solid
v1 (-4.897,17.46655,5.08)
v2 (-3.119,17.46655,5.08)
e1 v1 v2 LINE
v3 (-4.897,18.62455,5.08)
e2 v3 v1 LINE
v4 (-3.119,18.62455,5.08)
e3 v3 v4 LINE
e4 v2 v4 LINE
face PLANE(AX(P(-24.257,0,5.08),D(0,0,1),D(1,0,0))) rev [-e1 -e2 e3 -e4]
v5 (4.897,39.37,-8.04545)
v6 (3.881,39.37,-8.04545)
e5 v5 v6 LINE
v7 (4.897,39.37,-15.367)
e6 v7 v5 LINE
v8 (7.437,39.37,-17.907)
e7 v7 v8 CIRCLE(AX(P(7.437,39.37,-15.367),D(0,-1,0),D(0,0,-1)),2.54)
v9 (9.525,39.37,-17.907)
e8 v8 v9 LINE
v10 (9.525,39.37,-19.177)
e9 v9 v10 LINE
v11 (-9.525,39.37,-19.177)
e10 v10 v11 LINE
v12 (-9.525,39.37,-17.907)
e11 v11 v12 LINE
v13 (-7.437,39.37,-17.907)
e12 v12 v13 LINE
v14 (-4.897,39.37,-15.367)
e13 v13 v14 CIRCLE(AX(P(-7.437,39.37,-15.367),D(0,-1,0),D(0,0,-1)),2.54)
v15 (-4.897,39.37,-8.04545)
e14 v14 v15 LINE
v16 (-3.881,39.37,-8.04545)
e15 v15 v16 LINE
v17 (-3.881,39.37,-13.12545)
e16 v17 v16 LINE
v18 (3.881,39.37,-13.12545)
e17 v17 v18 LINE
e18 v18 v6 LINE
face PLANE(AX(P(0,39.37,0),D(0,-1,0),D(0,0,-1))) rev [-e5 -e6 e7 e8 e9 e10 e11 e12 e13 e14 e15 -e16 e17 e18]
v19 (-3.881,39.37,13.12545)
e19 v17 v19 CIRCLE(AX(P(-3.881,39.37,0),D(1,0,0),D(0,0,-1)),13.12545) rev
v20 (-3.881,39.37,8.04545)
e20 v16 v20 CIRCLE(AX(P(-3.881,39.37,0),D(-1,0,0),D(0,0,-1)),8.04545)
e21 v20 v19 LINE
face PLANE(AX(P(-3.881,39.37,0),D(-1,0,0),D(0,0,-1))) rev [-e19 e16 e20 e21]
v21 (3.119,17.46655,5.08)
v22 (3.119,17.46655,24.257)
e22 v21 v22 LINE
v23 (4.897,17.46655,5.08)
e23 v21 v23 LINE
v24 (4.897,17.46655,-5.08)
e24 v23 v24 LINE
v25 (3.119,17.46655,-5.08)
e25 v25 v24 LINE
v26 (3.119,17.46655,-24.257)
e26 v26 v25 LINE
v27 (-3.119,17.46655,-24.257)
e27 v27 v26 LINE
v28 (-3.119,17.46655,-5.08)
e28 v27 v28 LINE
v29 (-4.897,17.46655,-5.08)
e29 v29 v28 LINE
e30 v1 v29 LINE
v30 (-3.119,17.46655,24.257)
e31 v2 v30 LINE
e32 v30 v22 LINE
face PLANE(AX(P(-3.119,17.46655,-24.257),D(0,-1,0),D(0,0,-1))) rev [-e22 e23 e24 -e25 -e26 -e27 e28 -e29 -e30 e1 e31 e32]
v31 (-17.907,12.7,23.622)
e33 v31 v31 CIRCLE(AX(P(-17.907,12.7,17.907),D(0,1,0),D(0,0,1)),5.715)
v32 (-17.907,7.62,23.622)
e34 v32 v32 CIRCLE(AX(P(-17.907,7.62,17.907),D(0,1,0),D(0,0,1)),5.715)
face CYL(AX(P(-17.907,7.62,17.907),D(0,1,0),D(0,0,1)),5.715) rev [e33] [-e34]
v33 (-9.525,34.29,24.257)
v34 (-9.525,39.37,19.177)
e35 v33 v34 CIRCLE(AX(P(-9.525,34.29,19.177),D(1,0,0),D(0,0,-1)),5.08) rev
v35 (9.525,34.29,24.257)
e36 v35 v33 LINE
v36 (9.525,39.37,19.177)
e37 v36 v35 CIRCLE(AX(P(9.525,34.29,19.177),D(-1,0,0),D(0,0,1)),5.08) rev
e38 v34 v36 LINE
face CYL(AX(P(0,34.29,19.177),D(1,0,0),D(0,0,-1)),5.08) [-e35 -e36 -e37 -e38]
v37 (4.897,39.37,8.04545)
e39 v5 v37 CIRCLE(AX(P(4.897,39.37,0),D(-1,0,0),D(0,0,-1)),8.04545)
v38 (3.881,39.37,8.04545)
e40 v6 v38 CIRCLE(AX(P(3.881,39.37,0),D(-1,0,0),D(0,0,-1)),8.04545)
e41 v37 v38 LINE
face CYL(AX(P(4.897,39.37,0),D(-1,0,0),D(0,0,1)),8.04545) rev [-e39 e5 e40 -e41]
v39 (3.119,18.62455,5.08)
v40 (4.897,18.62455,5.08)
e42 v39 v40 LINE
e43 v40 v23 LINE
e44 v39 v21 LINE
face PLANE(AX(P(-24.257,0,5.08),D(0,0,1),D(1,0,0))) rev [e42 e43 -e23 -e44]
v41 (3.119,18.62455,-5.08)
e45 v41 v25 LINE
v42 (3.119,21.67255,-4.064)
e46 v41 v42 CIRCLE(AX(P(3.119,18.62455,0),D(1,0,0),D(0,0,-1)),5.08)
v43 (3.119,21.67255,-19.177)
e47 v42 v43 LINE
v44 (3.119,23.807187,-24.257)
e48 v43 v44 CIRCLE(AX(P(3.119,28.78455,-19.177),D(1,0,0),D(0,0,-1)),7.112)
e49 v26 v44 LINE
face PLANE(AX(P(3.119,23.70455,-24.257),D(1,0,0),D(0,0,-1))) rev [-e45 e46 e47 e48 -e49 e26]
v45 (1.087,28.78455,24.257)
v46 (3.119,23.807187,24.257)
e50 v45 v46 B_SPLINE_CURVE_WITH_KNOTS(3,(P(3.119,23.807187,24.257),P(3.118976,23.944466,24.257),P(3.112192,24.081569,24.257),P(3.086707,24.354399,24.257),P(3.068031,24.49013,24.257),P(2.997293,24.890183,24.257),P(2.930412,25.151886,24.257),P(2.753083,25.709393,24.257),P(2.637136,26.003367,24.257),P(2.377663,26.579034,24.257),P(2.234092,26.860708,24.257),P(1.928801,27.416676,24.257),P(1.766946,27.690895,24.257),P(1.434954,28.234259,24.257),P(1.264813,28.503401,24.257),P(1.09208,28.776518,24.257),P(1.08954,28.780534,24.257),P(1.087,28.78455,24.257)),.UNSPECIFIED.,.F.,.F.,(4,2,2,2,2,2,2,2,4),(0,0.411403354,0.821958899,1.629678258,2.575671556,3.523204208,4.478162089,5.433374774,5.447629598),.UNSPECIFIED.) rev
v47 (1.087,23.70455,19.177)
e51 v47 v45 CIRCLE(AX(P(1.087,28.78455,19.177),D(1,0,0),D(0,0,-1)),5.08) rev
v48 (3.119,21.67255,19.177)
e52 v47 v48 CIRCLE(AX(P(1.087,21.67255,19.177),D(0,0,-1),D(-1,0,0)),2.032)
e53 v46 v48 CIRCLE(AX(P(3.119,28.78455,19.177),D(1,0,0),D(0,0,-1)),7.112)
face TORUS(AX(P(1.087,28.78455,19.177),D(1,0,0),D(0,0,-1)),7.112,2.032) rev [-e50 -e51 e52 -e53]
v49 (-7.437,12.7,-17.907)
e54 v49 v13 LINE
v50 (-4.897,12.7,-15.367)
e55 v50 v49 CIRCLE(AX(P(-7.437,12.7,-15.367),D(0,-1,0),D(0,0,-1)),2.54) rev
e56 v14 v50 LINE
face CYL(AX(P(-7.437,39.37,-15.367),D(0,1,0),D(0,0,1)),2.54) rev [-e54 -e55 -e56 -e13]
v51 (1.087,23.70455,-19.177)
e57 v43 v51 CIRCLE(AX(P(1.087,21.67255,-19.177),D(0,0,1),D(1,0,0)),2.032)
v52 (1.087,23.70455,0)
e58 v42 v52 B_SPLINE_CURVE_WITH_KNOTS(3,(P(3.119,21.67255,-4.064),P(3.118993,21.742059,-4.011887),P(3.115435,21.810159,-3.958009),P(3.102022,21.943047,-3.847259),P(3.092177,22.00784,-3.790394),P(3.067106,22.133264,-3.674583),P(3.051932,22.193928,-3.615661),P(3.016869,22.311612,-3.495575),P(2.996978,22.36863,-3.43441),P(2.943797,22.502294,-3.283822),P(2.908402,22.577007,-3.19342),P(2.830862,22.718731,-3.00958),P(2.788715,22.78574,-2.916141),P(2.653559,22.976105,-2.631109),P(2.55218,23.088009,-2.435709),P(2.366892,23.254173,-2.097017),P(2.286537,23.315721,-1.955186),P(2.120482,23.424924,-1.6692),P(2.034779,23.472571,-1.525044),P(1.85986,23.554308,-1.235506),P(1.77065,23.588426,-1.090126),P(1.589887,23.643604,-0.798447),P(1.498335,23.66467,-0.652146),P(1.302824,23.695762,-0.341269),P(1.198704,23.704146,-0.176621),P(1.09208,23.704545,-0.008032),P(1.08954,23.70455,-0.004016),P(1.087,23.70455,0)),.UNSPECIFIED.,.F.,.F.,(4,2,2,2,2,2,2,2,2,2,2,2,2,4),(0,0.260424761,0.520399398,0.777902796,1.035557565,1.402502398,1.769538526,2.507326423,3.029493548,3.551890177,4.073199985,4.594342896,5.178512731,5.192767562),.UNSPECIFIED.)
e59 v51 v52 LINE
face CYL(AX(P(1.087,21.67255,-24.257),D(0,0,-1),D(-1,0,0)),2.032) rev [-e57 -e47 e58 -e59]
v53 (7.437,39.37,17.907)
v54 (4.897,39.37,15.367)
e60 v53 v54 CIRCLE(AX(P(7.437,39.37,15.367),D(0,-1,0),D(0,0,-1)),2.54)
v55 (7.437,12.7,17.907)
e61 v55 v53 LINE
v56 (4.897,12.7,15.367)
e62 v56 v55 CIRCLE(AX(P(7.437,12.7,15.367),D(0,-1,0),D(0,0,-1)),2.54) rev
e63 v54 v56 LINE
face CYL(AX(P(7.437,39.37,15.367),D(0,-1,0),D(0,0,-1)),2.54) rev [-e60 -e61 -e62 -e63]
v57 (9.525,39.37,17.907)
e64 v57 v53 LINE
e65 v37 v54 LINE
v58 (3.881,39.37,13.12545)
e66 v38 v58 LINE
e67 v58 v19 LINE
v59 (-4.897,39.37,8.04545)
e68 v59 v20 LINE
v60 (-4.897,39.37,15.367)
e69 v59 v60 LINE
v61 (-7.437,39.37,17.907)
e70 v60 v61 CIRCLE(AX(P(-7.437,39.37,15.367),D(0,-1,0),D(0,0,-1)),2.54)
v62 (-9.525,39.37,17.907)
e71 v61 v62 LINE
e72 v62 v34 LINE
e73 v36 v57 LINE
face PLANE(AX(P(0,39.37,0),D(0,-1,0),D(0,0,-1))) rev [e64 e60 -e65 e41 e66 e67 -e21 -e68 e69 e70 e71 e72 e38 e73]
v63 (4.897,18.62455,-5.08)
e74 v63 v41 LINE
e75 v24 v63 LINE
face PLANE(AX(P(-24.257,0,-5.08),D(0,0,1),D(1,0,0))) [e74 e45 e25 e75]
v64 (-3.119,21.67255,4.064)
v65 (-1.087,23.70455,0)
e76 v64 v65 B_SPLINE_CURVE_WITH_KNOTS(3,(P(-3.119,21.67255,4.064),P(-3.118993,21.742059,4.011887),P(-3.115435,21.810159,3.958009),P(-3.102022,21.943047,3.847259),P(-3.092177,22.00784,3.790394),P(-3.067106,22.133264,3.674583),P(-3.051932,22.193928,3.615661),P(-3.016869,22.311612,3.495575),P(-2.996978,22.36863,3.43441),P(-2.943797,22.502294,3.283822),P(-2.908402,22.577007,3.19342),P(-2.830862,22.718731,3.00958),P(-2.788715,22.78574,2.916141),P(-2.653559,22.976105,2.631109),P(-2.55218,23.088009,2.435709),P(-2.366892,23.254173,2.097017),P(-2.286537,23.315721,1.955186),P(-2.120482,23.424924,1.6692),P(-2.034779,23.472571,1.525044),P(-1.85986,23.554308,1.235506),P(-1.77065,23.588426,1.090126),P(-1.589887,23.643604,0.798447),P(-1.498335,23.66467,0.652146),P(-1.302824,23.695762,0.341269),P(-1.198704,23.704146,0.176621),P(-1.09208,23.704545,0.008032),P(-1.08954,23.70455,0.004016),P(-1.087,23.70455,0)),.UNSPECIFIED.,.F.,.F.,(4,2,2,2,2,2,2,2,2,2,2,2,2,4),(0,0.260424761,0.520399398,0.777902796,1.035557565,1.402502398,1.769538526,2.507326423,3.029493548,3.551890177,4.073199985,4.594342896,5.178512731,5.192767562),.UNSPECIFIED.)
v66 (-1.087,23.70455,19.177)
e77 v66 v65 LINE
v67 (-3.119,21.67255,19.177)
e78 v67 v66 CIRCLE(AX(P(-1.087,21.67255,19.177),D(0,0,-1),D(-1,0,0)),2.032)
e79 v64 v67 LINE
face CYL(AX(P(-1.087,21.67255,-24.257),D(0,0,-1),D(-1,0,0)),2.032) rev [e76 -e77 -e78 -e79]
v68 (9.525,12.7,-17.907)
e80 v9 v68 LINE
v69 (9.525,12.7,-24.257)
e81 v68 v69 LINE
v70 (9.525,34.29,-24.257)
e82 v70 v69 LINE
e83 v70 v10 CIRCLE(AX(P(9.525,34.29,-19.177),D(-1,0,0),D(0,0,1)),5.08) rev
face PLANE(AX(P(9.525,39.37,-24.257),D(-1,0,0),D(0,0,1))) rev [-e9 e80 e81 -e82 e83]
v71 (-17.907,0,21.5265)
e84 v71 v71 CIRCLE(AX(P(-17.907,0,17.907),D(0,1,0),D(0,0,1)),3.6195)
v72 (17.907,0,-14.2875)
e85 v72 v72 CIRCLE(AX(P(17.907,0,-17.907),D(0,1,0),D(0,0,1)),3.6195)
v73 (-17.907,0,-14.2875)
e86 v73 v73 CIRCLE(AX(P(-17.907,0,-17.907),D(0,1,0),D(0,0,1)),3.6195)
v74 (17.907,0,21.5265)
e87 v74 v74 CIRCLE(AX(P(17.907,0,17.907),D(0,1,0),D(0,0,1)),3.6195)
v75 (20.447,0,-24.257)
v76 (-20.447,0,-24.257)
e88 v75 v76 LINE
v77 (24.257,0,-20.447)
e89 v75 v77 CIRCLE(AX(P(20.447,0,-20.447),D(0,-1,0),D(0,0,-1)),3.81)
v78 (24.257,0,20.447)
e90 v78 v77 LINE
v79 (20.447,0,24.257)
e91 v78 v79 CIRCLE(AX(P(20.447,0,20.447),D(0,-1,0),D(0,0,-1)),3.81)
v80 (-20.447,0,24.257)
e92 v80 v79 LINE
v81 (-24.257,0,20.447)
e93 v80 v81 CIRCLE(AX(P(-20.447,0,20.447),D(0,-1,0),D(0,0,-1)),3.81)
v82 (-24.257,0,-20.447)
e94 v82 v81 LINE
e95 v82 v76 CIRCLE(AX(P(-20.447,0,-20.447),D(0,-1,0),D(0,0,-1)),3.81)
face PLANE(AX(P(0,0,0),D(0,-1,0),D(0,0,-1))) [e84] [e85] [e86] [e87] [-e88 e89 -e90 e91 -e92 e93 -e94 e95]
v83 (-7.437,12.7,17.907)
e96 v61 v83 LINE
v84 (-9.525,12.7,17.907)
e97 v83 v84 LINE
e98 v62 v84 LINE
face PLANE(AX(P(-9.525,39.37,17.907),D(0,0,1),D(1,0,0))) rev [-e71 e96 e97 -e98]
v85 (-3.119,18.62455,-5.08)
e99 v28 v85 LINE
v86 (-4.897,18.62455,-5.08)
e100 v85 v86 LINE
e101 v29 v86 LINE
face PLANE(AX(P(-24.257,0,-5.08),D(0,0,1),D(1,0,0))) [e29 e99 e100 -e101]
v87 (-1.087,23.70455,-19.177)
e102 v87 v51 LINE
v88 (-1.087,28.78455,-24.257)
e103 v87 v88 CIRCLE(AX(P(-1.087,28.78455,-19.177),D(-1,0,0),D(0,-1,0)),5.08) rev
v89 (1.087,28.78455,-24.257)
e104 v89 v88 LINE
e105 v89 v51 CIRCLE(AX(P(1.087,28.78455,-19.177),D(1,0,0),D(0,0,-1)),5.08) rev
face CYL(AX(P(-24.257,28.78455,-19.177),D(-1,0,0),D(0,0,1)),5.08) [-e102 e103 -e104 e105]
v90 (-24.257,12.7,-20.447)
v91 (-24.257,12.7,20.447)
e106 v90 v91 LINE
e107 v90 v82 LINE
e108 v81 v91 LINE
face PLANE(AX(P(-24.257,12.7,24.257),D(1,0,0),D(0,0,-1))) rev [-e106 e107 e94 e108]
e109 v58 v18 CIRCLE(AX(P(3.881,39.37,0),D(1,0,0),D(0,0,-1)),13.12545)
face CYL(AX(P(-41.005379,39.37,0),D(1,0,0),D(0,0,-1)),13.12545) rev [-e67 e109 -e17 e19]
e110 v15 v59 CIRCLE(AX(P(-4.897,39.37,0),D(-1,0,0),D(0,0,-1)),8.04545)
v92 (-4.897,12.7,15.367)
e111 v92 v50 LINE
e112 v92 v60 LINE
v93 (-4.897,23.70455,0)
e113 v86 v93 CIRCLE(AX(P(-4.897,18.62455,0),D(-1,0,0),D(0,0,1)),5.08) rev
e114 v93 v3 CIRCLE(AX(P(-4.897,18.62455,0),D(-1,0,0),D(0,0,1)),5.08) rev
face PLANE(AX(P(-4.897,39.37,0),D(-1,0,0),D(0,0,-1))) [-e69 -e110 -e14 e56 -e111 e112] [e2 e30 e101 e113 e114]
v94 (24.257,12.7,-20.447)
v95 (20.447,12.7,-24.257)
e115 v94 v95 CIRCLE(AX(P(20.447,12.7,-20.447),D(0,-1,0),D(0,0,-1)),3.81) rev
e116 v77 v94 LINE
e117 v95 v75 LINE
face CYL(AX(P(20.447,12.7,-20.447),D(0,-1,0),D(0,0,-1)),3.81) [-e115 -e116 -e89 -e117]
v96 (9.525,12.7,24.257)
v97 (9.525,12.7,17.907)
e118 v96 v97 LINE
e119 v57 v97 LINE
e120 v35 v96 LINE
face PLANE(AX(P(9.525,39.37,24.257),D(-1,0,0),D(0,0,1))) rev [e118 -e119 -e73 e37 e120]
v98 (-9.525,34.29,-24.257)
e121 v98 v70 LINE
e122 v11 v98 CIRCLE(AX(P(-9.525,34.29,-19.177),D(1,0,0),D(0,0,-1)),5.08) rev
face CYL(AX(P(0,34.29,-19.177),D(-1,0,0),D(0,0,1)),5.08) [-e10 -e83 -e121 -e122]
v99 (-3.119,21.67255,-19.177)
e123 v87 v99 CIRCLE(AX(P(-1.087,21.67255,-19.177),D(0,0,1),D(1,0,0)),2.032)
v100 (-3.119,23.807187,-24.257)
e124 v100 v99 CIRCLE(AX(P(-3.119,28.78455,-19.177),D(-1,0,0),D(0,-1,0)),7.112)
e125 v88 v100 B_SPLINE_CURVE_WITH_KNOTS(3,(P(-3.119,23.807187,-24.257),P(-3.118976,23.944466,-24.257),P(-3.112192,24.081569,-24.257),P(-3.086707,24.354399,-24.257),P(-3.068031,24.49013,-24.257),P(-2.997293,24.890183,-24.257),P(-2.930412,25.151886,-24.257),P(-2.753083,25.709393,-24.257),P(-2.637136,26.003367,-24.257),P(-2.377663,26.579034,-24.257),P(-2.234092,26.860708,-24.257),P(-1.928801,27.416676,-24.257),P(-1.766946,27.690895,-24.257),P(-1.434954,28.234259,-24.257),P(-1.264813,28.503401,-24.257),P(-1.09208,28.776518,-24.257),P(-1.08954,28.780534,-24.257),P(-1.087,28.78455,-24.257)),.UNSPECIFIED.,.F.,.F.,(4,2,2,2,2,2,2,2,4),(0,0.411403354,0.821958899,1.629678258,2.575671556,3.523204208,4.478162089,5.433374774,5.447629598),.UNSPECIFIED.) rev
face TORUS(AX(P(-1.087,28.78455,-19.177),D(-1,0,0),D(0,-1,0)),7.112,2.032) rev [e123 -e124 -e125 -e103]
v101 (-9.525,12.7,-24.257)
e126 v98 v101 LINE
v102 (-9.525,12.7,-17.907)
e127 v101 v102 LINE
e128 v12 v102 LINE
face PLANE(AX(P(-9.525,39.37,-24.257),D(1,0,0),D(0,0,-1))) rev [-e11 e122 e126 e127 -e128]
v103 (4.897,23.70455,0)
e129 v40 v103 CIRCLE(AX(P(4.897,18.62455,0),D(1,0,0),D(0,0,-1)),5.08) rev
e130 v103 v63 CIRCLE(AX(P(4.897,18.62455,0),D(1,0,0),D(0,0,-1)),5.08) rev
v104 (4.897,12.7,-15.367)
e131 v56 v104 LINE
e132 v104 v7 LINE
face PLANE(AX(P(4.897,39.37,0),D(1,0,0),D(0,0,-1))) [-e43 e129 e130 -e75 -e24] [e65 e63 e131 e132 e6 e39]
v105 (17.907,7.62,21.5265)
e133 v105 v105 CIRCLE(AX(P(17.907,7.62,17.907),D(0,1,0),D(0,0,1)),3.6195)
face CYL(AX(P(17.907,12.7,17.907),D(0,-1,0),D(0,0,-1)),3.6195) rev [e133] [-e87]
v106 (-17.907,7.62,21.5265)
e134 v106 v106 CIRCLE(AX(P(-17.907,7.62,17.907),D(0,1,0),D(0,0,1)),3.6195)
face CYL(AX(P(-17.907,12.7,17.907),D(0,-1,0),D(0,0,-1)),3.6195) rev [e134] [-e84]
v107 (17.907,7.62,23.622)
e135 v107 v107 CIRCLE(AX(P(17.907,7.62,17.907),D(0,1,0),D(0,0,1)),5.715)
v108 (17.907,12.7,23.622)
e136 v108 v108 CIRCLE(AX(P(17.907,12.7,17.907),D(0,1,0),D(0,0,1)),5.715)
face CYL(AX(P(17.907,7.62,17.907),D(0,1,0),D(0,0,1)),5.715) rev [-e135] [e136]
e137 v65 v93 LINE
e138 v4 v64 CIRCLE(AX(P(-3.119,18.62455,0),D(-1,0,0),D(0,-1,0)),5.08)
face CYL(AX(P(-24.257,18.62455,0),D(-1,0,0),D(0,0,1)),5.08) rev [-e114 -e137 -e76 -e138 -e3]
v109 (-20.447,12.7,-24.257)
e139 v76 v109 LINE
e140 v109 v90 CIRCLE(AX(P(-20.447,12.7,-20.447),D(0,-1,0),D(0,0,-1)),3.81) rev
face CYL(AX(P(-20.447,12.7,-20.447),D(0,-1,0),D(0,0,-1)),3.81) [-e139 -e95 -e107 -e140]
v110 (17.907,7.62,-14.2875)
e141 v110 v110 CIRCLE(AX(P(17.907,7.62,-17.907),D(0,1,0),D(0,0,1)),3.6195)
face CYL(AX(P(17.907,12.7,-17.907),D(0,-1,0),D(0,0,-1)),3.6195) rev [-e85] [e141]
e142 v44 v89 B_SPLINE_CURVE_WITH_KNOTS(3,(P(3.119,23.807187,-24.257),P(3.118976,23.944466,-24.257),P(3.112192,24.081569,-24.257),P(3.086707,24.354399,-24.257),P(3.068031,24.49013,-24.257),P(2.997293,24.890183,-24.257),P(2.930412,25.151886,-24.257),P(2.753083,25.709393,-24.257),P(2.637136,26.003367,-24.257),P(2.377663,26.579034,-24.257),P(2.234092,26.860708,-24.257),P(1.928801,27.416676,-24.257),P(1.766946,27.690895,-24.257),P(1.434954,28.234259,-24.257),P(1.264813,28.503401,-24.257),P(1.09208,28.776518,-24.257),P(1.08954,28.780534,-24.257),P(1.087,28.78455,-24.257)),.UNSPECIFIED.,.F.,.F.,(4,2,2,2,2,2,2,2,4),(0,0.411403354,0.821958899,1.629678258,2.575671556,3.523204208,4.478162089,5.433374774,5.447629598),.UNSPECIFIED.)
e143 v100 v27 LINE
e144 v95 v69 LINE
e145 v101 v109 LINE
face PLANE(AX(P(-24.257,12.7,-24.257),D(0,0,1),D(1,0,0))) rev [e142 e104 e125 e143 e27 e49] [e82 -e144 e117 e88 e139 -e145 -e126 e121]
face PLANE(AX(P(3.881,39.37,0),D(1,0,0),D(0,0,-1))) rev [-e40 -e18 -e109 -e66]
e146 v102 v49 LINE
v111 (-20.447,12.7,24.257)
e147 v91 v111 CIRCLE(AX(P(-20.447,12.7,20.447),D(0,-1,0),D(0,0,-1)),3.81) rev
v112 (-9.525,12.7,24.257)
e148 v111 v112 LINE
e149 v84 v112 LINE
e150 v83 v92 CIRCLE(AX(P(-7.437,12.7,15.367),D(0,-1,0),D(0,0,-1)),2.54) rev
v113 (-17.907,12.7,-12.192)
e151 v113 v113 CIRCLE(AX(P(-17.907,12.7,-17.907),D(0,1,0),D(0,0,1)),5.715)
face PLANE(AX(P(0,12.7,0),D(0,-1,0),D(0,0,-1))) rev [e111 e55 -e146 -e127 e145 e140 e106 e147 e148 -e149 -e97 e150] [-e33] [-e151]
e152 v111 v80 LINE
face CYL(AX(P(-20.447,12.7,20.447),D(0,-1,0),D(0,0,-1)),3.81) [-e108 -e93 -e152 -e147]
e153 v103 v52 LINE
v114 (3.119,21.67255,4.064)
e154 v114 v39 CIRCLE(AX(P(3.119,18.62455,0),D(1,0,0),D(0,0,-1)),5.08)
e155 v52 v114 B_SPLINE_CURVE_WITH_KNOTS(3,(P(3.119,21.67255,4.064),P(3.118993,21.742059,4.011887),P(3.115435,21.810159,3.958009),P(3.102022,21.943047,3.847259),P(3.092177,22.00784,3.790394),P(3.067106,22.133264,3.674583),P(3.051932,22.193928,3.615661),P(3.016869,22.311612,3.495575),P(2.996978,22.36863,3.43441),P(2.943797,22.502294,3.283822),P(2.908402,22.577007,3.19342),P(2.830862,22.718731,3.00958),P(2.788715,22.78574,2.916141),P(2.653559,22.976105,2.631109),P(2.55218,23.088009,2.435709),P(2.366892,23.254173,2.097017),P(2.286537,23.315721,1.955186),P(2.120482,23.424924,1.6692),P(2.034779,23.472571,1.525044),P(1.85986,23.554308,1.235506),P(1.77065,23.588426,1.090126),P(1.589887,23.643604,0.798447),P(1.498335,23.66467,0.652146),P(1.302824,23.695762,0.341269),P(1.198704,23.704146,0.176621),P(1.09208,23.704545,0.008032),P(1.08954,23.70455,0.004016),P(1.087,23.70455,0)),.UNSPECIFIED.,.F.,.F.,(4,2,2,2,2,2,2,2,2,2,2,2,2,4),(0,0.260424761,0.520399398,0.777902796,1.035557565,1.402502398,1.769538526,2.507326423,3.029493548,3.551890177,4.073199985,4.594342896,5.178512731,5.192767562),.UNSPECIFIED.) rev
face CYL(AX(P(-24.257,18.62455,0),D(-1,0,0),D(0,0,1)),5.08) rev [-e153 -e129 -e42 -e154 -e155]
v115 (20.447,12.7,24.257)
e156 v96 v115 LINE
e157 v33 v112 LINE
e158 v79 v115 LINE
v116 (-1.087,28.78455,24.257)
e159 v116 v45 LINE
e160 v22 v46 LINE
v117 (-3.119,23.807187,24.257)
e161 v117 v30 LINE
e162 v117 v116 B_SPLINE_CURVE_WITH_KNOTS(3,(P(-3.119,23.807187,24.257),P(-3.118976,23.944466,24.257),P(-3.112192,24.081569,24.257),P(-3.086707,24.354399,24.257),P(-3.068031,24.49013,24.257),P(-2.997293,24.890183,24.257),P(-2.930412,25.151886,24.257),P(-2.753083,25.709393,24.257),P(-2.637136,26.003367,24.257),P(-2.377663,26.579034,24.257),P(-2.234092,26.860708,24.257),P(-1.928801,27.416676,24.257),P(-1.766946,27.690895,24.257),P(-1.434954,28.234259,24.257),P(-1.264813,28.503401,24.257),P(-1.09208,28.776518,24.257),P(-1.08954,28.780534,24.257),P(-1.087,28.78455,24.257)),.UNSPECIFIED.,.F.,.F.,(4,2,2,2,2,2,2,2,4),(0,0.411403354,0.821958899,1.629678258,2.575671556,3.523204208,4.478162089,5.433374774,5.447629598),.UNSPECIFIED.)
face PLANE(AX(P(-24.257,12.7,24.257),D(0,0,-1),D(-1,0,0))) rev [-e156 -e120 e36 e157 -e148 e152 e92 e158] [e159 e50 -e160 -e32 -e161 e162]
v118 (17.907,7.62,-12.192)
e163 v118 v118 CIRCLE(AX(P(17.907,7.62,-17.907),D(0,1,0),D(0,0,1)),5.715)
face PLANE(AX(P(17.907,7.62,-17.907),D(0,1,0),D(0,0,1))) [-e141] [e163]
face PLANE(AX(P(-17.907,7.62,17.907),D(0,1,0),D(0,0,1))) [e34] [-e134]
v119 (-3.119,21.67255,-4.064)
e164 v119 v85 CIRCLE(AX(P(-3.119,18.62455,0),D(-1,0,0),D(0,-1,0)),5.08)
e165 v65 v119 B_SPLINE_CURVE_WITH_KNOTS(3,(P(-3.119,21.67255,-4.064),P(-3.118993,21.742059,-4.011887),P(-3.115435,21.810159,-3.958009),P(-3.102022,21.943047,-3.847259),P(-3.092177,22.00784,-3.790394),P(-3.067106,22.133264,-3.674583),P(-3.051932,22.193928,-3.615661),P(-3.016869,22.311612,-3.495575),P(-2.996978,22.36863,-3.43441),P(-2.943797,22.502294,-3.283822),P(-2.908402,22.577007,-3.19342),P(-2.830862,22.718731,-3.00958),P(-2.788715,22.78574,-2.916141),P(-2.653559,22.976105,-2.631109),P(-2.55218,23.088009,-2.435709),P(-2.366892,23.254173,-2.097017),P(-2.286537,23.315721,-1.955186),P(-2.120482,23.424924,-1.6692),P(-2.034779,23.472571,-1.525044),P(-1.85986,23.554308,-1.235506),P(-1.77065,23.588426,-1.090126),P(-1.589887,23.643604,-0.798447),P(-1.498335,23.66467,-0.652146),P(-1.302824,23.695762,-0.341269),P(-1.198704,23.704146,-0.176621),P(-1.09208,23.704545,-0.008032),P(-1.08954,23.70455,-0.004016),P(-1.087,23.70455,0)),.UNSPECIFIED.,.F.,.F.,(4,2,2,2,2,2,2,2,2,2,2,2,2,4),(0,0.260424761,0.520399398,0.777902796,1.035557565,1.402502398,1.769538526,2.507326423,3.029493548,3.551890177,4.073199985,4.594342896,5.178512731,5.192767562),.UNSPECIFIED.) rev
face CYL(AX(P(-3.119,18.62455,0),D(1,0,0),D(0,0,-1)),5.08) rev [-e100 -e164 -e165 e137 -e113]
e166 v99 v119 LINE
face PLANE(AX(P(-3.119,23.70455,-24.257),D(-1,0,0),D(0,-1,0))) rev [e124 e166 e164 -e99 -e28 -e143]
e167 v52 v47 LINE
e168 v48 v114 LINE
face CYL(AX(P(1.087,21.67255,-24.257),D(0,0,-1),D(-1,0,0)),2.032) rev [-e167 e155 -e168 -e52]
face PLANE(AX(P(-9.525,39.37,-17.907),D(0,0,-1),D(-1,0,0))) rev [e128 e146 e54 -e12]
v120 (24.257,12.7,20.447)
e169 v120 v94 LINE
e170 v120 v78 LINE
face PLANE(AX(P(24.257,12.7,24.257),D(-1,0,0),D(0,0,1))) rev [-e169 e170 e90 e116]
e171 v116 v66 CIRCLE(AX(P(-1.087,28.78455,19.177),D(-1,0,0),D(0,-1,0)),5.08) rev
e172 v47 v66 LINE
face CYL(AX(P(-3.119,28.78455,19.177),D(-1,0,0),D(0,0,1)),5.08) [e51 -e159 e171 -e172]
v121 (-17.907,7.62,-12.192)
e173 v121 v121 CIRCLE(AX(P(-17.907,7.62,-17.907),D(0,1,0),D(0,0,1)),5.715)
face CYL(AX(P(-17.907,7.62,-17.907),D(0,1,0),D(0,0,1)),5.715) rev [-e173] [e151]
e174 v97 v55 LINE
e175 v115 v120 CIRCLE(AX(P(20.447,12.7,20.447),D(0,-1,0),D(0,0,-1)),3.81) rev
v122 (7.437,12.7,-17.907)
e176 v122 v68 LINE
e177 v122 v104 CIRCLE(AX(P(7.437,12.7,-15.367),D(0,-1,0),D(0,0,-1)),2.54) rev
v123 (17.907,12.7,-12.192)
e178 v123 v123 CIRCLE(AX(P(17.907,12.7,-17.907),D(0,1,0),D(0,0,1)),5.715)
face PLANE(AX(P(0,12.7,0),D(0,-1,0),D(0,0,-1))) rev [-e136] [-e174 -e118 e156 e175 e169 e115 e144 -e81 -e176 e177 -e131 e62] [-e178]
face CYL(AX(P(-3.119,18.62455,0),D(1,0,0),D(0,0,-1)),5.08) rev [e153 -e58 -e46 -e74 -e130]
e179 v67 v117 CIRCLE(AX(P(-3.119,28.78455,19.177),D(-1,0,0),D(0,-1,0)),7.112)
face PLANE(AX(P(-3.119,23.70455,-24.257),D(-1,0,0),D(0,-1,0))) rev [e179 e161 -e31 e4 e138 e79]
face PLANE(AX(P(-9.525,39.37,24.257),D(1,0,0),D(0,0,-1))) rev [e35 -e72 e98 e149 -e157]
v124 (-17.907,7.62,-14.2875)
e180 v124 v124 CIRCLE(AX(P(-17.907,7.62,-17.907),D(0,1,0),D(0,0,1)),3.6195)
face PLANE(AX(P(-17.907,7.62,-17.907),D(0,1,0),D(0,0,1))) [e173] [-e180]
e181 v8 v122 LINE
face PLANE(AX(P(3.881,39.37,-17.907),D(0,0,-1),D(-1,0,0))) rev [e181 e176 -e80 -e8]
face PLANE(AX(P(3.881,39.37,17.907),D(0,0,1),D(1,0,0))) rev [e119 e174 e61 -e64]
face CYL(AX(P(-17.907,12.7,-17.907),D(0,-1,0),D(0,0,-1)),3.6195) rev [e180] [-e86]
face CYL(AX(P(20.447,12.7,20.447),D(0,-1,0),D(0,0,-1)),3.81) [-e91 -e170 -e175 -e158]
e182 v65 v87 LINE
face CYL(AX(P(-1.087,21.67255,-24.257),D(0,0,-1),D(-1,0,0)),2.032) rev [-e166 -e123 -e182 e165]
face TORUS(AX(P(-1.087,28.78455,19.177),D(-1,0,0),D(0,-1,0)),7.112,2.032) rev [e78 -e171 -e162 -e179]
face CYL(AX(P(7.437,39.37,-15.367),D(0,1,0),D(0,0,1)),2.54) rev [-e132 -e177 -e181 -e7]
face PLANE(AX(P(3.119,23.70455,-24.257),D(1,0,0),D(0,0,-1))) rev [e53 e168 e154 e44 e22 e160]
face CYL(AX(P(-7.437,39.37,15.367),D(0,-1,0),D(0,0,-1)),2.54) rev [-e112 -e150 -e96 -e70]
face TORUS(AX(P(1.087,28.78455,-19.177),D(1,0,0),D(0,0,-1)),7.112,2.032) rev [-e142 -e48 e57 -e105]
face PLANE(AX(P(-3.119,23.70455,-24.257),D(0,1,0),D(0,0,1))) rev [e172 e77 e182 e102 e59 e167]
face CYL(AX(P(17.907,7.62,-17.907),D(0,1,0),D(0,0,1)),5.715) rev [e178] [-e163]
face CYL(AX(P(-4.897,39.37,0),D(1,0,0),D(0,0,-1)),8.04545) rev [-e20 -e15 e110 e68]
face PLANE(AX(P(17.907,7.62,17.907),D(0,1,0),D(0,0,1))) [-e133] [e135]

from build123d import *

# Parameters (mm, degrees)
SKETCH1_W           = 48.514
SKETCH1_H           = 48.514
SKETCH1_R           = 3.6195
BOSS_EXTRUDE1_DEPTH = 12.7
FILLET1_R           = 3.81
SKETCH4_R           = 5.715
CUT_EXTRUDE2_DEPTH  = 5.08
BOSS_EXTRUDE3_DEPTH = 26.67
SKETCH8_R           = 13.12545
CUT_EXTRUDE4_DEPTH  = 7.762
SKETCH11_W          = 6.238
SKETCH11_H          = 6.238
CUT_EXTRUDE7_DEPTH  = 68.022437624
SKETCH13_W          = 5.08
SKETCH13_H          = 6.238
CUT_EXTRUDE8_DEPTH  = 55.130822948
SKETCH14_W          = 10.16
SKETCH14_H          = 6.238
BOSS_EXTRUDE4_DEPTH = 1.016
FILLET3_R           = 5.08
FILLET2_R           = 2.54
FILLET4_R           = 2.032
FILLET6_R           = 5.08


# Some blends are built 0.0001 mm under size
with BuildPart() as part:
    # Sketch1 → Boss-Extrude1 (new body)
    with BuildSketch(Plane(origin=(0, 0, 0), x_dir=(1, 0, 0), z_dir=(0, 1, 0))):
        Rectangle(SKETCH1_W, SKETCH1_H)
        with Locations(Location((-17.907, 17.907, 0), (0, 0, 270))):
            Circle(SKETCH1_R, mode=Mode.SUBTRACT)
        with Locations(Location((17.907, 17.907, 0), (0, 0, 270))):
            Circle(SKETCH1_R, mode=Mode.SUBTRACT)
        with Locations(Location((17.907, -17.907, 0), (0, 0, 270))):
            Circle(SKETCH1_R, mode=Mode.SUBTRACT)
        with Locations(Location((-17.907, -17.907, 0), (0, 0, 270))):
            Circle(SKETCH1_R, mode=Mode.SUBTRACT)
    extrude(amount=BOSS_EXTRUDE1_DEPTH)

    # Fillet1
    fillet1_edges = [part.edges().sort_by_distance(p)[0] for p in [
        (24.257, 6.35, 24.257),
        (-24.257, 6.35, 24.257),
        (-24.257, 6.35, -24.257),
        (24.257, 6.35, -24.257),
    ]]
    fillet(fillet1_edges, radius=FILLET1_R)

    # Sketch4 → Cut-Extrude2 (cut)
    with BuildSketch(Plane(origin=(0, 12.7, 0), x_dir=(1, 0, 0), z_dir=(0, 1, 0))):
        with Locations(Location((-17.907, 17.907, 0), (0, 0, 270))):
            Circle(SKETCH4_R)
        with Locations(Location((17.907, -17.907, 0), (0, 0, 270))):
            Circle(SKETCH4_R)
        with Locations(Location((17.907, 17.907, 0), (0, 0, 270))):
            Circle(SKETCH4_R)
        with Locations(Location((-17.907, -17.907, 0), (0, 0, 270))):
            Circle(SKETCH4_R)
    extrude(amount=-CUT_EXTRUDE2_DEPTH, mode=Mode.SUBTRACT)

    # Sketch6 → Boss-Extrude3 (add)
    with BuildSketch(Plane(origin=(0, 12.7, 0), x_dir=(1, 0, 0), z_dir=(0, 1, 0))):
        Polygon((-3.881, 17.907), (-3.881, -17.907), (-9.525, -17.907), (-9.525, -24.257), (9.525, -24.257), (9.525, -17.907), (3.881, -17.907), (3.881, 17.907), (9.525, 17.907), (9.525, 24.257), (-9.525, 24.257), (-9.525, 17.907), align=None)
    extrude(amount=BOSS_EXTRUDE3_DEPTH)

    # Sketch8 → Cut-Extrude4 (cut)
    with BuildSketch(Plane(origin=(3.881, 0, 0), x_dir=(0, 0, -1), z_dir=(1, 0, 0))):
        with Locations((0, 39.37)):
            Circle(SKETCH8_R)
    extrude(amount=-CUT_EXTRUDE4_DEPTH, mode=Mode.SUBTRACT)

    # Sketch11 → Cut-Extrude7 (cut, through all)
    with BuildSketch(Plane.XY.offset(24.257)):
        with Locations((0, 20.58555)):
            Rectangle(SKETCH11_W, SKETCH11_H)
    extrude(amount=-CUT_EXTRUDE7_DEPTH, mode=Mode.SUBTRACT)

    # Sketch13 → Cut-Extrude8 (cut, through all)
    with BuildSketch(Plane(origin=(3.881, 0, 0), x_dir=(0, 0, -1), z_dir=(1, 0, 0))):
        with Locations((-2.54, 20.58555)):
            Rectangle(SKETCH13_W, SKETCH13_H)
        with Locations((2.54, 20.58555)):
            Rectangle(SKETCH13_W, SKETCH13_H)
    extrude(amount=-CUT_EXTRUDE8_DEPTH, mode=Mode.SUBTRACT)

    # Sketch14 → Boss-Extrude4 (add)
    with BuildSketch(Plane(origin=(3.881, 0, 0), x_dir=(0, 0, -1), z_dir=(1, 0, 0))):
        with BuildLine():
            Line((17.907, 39.37), (8.04545, 39.37))
            ThreePointArc((8.04545, 39.37), (0, 31.32455), (-8.04545, 39.37))
            Line((-8.04545, 39.37), (-17.907, 39.37))
            Line((-17.907, 39.37), (-17.907, 12.7))
            Line((-17.907, 12.7), (17.907, 12.7))
            Line((17.907, 12.7), (17.907, 39.37))
        make_face()
        with Locations((0, 20.58555)):
            Rectangle(SKETCH14_W, SKETCH14_H, mode=Mode.SUBTRACT)
    boss_extrude4 = extrude(amount=BOSS_EXTRUDE4_DEPTH)

    # Mirror1: Boss-Extrude4 across plane
    add(boss_extrude4.mirror(Plane(origin=(0, 0, 0), x_dir=(0, 0, 1), z_dir=(1, 0, 0))))

    # Fillet3
    fillet3_edges = [part.edges().sort_by_distance(p)[0] for p in [
        (0, 23.70455, -24.257),
        (0, 23.70455, 24.257),
        (0, 39.37, 24.257),
        (0, 39.37, -24.257),
    ]]
    fillet(fillet3_edges, radius=FILLET3_R)

    # Fillet2
    fillet2_edges = [part.edges().sort_by_distance(p)[0] for p in [
        (4.897, 26.035, -17.907),
        (4.897, 26.035, 17.907),
        (-4.897, 26.035, -17.907),
        (-4.897, 26.035, 17.907),
    ]]
    fillet(fillet2_edges, radius=FILLET2_R)

    # Fillet4
    # the kernel refuses this fillet: 2.032 mm, written as the material it adds along each edge
    with BuildSketch(Plane(origin=(3.119, 23.70455, 19.177), x_dir=(-1, 0, 0), z_dir=(0, 0, -1)), Plane(origin=(3.119, 23.70455, -5.08), x_dir=(-1, 0, 0), z_dir=(0, 0, -1))) as fillet4_piece_1:
        with BuildLine():
            CenterArc((FILLET4_R, -FILLET4_R), FILLET4_R, 90, 90)
            Line((0, -FILLET4_R), (0, 0))
            Line((0, 0), (FILLET4_R, 0))
        make_face()
    extrude(amount=14.097)
    with BuildSketch(Plane(origin=(-3.119, 23.70455, 19.177), x_dir=(1, 0, 0), z_dir=(0, 0, -1)), Plane(origin=(-3.119, 23.70455, -5.08), x_dir=(1, 0, 0), z_dir=(0, 0, -1))) as fillet4_piece_2:
        with BuildLine():
            CenterArc((FILLET4_R, FILLET4_R), FILLET4_R, 180, 90)
            Line((0, FILLET4_R), (0, 0))
            Line((0, 0), (FILLET4_R, 0))
        make_face()
    extrude(amount=14.097)
    with BuildSketch(Plane(origin=(-3.119, 28.78455, -19.177), x_dir=(0, 0.8416879607506225, -0.5399642365263265), z_dir=(0, 0.5399642365263265, 0.8416879607506225))) as fillet4_piece_3_section:
        with BuildLine():
            CenterArc((5.08 + FILLET4_R, -FILLET4_R), FILLET4_R, 90, 90)
            Line((5.08, -FILLET4_R), (5.08, 0))
            Line((5.08, 0), (5.08 + FILLET4_R, 0))
        make_face()
    fillet4_piece_3 = revolve(axis=Axis((-3.119, 28.78455, -19.177), (-1, 0, 0)), revolution_arc=147.318795695, mode=Mode.PRIVATE)
    fillet4_piece_3 = split(fillet4_piece_3, bisect_by=Plane(origin=(-3.119, 28.78455, -24.257), z_dir=(0, 0, 1)), keep=Keep.TOP, mode=Mode.PRIVATE)
    add(fillet4_piece_3)
    with BuildSketch(Plane(origin=(3.119, 28.78455, -19.177), x_dir=(0, 0.8416879607506221, -0.5399642365263271), z_dir=(0, 0.5399642365263271, 0.8416879607506221))) as fillet4_piece_4_section:
        with BuildLine():
            CenterArc((5.08 + FILLET4_R, FILLET4_R), FILLET4_R, 180, 90)
            Line((5.08 + FILLET4_R, 0), (5.08, 0))
            Line((5.08, 0), (5.08, FILLET4_R))
        make_face()
    fillet4_piece_4 = revolve(axis=Axis((3.119, 28.78455, -19.177), (-1, 0, 0)), revolution_arc=147.318795695, mode=Mode.PRIVATE)
    fillet4_piece_4 = split(fillet4_piece_4, bisect_by=Plane(origin=(3.119, 28.78455, -24.257), z_dir=(0, 0, 1)), keep=Keep.TOP, mode=Mode.PRIVATE)
    add(fillet4_piece_4)
    with BuildSketch(Plane(origin=(-3.119, 28.78455, 19.177), x_dir=(0, 0.8416879607506225, 0.5399642365263265), z_dir=(0, 0.5399642365263265, -0.8416879607506225))) as fillet4_piece_5_section:
        with BuildLine():
            CenterArc((5.08 + FILLET4_R, FILLET4_R), FILLET4_R, 180, 90)
            Line((5.08, FILLET4_R), (5.08, 0))
            Line((5.08, 0), (5.08 + FILLET4_R, 0))
        make_face()
    fillet4_piece_5 = revolve(axis=Axis((-3.119, 28.78455, 19.177), (1, 0, 0)), revolution_arc=147.318795695, mode=Mode.PRIVATE)
    fillet4_piece_5 = split(fillet4_piece_5, bisect_by=Plane(origin=(-3.119, 28.78455, 24.257), z_dir=(0, 0, -1)), keep=Keep.TOP, mode=Mode.PRIVATE)
    add(fillet4_piece_5)
    with BuildSketch(Plane(origin=(3.119, 28.78455, 19.177), x_dir=(0, 0.8416879607506221, 0.5399642365263271), z_dir=(0, 0.5399642365263271, -0.8416879607506221))) as fillet4_piece_6_section:
        with BuildLine():
            CenterArc((5.08 + FILLET4_R, -FILLET4_R), FILLET4_R, 90, 90)
            Line((5.08, -FILLET4_R), (5.08, 0))
            Line((5.08, 0), (5.08 + FILLET4_R, 0))
        make_face()
    fillet4_piece_6 = revolve(axis=Axis((3.119, 28.78455, 19.177), (1, 0, 0)), revolution_arc=147.318795695, mode=Mode.PRIVATE)
    fillet4_piece_6 = split(fillet4_piece_6, bisect_by=Plane(origin=(3.119, 28.78455, 24.257), z_dir=(0, 0, -1)), keep=Keep.TOP, mode=Mode.PRIVATE)
    add(fillet4_piece_6)

    # Fillet6
    fillet6_edges = [part.edges().sort_by_distance(p)[0] for p in [
        (-2.992, 23.70455, -5.08),
        (2.992, 23.70455, -5.08),
        (-2.992, 23.70455, 5.08),
        (2.992, 23.70455, 5.08),
    ]]
    fillet(fillet6_edges, radius=FILLET6_R - 0.0001)  # a hair under: the kernel refuses the full size


solid = part.part
